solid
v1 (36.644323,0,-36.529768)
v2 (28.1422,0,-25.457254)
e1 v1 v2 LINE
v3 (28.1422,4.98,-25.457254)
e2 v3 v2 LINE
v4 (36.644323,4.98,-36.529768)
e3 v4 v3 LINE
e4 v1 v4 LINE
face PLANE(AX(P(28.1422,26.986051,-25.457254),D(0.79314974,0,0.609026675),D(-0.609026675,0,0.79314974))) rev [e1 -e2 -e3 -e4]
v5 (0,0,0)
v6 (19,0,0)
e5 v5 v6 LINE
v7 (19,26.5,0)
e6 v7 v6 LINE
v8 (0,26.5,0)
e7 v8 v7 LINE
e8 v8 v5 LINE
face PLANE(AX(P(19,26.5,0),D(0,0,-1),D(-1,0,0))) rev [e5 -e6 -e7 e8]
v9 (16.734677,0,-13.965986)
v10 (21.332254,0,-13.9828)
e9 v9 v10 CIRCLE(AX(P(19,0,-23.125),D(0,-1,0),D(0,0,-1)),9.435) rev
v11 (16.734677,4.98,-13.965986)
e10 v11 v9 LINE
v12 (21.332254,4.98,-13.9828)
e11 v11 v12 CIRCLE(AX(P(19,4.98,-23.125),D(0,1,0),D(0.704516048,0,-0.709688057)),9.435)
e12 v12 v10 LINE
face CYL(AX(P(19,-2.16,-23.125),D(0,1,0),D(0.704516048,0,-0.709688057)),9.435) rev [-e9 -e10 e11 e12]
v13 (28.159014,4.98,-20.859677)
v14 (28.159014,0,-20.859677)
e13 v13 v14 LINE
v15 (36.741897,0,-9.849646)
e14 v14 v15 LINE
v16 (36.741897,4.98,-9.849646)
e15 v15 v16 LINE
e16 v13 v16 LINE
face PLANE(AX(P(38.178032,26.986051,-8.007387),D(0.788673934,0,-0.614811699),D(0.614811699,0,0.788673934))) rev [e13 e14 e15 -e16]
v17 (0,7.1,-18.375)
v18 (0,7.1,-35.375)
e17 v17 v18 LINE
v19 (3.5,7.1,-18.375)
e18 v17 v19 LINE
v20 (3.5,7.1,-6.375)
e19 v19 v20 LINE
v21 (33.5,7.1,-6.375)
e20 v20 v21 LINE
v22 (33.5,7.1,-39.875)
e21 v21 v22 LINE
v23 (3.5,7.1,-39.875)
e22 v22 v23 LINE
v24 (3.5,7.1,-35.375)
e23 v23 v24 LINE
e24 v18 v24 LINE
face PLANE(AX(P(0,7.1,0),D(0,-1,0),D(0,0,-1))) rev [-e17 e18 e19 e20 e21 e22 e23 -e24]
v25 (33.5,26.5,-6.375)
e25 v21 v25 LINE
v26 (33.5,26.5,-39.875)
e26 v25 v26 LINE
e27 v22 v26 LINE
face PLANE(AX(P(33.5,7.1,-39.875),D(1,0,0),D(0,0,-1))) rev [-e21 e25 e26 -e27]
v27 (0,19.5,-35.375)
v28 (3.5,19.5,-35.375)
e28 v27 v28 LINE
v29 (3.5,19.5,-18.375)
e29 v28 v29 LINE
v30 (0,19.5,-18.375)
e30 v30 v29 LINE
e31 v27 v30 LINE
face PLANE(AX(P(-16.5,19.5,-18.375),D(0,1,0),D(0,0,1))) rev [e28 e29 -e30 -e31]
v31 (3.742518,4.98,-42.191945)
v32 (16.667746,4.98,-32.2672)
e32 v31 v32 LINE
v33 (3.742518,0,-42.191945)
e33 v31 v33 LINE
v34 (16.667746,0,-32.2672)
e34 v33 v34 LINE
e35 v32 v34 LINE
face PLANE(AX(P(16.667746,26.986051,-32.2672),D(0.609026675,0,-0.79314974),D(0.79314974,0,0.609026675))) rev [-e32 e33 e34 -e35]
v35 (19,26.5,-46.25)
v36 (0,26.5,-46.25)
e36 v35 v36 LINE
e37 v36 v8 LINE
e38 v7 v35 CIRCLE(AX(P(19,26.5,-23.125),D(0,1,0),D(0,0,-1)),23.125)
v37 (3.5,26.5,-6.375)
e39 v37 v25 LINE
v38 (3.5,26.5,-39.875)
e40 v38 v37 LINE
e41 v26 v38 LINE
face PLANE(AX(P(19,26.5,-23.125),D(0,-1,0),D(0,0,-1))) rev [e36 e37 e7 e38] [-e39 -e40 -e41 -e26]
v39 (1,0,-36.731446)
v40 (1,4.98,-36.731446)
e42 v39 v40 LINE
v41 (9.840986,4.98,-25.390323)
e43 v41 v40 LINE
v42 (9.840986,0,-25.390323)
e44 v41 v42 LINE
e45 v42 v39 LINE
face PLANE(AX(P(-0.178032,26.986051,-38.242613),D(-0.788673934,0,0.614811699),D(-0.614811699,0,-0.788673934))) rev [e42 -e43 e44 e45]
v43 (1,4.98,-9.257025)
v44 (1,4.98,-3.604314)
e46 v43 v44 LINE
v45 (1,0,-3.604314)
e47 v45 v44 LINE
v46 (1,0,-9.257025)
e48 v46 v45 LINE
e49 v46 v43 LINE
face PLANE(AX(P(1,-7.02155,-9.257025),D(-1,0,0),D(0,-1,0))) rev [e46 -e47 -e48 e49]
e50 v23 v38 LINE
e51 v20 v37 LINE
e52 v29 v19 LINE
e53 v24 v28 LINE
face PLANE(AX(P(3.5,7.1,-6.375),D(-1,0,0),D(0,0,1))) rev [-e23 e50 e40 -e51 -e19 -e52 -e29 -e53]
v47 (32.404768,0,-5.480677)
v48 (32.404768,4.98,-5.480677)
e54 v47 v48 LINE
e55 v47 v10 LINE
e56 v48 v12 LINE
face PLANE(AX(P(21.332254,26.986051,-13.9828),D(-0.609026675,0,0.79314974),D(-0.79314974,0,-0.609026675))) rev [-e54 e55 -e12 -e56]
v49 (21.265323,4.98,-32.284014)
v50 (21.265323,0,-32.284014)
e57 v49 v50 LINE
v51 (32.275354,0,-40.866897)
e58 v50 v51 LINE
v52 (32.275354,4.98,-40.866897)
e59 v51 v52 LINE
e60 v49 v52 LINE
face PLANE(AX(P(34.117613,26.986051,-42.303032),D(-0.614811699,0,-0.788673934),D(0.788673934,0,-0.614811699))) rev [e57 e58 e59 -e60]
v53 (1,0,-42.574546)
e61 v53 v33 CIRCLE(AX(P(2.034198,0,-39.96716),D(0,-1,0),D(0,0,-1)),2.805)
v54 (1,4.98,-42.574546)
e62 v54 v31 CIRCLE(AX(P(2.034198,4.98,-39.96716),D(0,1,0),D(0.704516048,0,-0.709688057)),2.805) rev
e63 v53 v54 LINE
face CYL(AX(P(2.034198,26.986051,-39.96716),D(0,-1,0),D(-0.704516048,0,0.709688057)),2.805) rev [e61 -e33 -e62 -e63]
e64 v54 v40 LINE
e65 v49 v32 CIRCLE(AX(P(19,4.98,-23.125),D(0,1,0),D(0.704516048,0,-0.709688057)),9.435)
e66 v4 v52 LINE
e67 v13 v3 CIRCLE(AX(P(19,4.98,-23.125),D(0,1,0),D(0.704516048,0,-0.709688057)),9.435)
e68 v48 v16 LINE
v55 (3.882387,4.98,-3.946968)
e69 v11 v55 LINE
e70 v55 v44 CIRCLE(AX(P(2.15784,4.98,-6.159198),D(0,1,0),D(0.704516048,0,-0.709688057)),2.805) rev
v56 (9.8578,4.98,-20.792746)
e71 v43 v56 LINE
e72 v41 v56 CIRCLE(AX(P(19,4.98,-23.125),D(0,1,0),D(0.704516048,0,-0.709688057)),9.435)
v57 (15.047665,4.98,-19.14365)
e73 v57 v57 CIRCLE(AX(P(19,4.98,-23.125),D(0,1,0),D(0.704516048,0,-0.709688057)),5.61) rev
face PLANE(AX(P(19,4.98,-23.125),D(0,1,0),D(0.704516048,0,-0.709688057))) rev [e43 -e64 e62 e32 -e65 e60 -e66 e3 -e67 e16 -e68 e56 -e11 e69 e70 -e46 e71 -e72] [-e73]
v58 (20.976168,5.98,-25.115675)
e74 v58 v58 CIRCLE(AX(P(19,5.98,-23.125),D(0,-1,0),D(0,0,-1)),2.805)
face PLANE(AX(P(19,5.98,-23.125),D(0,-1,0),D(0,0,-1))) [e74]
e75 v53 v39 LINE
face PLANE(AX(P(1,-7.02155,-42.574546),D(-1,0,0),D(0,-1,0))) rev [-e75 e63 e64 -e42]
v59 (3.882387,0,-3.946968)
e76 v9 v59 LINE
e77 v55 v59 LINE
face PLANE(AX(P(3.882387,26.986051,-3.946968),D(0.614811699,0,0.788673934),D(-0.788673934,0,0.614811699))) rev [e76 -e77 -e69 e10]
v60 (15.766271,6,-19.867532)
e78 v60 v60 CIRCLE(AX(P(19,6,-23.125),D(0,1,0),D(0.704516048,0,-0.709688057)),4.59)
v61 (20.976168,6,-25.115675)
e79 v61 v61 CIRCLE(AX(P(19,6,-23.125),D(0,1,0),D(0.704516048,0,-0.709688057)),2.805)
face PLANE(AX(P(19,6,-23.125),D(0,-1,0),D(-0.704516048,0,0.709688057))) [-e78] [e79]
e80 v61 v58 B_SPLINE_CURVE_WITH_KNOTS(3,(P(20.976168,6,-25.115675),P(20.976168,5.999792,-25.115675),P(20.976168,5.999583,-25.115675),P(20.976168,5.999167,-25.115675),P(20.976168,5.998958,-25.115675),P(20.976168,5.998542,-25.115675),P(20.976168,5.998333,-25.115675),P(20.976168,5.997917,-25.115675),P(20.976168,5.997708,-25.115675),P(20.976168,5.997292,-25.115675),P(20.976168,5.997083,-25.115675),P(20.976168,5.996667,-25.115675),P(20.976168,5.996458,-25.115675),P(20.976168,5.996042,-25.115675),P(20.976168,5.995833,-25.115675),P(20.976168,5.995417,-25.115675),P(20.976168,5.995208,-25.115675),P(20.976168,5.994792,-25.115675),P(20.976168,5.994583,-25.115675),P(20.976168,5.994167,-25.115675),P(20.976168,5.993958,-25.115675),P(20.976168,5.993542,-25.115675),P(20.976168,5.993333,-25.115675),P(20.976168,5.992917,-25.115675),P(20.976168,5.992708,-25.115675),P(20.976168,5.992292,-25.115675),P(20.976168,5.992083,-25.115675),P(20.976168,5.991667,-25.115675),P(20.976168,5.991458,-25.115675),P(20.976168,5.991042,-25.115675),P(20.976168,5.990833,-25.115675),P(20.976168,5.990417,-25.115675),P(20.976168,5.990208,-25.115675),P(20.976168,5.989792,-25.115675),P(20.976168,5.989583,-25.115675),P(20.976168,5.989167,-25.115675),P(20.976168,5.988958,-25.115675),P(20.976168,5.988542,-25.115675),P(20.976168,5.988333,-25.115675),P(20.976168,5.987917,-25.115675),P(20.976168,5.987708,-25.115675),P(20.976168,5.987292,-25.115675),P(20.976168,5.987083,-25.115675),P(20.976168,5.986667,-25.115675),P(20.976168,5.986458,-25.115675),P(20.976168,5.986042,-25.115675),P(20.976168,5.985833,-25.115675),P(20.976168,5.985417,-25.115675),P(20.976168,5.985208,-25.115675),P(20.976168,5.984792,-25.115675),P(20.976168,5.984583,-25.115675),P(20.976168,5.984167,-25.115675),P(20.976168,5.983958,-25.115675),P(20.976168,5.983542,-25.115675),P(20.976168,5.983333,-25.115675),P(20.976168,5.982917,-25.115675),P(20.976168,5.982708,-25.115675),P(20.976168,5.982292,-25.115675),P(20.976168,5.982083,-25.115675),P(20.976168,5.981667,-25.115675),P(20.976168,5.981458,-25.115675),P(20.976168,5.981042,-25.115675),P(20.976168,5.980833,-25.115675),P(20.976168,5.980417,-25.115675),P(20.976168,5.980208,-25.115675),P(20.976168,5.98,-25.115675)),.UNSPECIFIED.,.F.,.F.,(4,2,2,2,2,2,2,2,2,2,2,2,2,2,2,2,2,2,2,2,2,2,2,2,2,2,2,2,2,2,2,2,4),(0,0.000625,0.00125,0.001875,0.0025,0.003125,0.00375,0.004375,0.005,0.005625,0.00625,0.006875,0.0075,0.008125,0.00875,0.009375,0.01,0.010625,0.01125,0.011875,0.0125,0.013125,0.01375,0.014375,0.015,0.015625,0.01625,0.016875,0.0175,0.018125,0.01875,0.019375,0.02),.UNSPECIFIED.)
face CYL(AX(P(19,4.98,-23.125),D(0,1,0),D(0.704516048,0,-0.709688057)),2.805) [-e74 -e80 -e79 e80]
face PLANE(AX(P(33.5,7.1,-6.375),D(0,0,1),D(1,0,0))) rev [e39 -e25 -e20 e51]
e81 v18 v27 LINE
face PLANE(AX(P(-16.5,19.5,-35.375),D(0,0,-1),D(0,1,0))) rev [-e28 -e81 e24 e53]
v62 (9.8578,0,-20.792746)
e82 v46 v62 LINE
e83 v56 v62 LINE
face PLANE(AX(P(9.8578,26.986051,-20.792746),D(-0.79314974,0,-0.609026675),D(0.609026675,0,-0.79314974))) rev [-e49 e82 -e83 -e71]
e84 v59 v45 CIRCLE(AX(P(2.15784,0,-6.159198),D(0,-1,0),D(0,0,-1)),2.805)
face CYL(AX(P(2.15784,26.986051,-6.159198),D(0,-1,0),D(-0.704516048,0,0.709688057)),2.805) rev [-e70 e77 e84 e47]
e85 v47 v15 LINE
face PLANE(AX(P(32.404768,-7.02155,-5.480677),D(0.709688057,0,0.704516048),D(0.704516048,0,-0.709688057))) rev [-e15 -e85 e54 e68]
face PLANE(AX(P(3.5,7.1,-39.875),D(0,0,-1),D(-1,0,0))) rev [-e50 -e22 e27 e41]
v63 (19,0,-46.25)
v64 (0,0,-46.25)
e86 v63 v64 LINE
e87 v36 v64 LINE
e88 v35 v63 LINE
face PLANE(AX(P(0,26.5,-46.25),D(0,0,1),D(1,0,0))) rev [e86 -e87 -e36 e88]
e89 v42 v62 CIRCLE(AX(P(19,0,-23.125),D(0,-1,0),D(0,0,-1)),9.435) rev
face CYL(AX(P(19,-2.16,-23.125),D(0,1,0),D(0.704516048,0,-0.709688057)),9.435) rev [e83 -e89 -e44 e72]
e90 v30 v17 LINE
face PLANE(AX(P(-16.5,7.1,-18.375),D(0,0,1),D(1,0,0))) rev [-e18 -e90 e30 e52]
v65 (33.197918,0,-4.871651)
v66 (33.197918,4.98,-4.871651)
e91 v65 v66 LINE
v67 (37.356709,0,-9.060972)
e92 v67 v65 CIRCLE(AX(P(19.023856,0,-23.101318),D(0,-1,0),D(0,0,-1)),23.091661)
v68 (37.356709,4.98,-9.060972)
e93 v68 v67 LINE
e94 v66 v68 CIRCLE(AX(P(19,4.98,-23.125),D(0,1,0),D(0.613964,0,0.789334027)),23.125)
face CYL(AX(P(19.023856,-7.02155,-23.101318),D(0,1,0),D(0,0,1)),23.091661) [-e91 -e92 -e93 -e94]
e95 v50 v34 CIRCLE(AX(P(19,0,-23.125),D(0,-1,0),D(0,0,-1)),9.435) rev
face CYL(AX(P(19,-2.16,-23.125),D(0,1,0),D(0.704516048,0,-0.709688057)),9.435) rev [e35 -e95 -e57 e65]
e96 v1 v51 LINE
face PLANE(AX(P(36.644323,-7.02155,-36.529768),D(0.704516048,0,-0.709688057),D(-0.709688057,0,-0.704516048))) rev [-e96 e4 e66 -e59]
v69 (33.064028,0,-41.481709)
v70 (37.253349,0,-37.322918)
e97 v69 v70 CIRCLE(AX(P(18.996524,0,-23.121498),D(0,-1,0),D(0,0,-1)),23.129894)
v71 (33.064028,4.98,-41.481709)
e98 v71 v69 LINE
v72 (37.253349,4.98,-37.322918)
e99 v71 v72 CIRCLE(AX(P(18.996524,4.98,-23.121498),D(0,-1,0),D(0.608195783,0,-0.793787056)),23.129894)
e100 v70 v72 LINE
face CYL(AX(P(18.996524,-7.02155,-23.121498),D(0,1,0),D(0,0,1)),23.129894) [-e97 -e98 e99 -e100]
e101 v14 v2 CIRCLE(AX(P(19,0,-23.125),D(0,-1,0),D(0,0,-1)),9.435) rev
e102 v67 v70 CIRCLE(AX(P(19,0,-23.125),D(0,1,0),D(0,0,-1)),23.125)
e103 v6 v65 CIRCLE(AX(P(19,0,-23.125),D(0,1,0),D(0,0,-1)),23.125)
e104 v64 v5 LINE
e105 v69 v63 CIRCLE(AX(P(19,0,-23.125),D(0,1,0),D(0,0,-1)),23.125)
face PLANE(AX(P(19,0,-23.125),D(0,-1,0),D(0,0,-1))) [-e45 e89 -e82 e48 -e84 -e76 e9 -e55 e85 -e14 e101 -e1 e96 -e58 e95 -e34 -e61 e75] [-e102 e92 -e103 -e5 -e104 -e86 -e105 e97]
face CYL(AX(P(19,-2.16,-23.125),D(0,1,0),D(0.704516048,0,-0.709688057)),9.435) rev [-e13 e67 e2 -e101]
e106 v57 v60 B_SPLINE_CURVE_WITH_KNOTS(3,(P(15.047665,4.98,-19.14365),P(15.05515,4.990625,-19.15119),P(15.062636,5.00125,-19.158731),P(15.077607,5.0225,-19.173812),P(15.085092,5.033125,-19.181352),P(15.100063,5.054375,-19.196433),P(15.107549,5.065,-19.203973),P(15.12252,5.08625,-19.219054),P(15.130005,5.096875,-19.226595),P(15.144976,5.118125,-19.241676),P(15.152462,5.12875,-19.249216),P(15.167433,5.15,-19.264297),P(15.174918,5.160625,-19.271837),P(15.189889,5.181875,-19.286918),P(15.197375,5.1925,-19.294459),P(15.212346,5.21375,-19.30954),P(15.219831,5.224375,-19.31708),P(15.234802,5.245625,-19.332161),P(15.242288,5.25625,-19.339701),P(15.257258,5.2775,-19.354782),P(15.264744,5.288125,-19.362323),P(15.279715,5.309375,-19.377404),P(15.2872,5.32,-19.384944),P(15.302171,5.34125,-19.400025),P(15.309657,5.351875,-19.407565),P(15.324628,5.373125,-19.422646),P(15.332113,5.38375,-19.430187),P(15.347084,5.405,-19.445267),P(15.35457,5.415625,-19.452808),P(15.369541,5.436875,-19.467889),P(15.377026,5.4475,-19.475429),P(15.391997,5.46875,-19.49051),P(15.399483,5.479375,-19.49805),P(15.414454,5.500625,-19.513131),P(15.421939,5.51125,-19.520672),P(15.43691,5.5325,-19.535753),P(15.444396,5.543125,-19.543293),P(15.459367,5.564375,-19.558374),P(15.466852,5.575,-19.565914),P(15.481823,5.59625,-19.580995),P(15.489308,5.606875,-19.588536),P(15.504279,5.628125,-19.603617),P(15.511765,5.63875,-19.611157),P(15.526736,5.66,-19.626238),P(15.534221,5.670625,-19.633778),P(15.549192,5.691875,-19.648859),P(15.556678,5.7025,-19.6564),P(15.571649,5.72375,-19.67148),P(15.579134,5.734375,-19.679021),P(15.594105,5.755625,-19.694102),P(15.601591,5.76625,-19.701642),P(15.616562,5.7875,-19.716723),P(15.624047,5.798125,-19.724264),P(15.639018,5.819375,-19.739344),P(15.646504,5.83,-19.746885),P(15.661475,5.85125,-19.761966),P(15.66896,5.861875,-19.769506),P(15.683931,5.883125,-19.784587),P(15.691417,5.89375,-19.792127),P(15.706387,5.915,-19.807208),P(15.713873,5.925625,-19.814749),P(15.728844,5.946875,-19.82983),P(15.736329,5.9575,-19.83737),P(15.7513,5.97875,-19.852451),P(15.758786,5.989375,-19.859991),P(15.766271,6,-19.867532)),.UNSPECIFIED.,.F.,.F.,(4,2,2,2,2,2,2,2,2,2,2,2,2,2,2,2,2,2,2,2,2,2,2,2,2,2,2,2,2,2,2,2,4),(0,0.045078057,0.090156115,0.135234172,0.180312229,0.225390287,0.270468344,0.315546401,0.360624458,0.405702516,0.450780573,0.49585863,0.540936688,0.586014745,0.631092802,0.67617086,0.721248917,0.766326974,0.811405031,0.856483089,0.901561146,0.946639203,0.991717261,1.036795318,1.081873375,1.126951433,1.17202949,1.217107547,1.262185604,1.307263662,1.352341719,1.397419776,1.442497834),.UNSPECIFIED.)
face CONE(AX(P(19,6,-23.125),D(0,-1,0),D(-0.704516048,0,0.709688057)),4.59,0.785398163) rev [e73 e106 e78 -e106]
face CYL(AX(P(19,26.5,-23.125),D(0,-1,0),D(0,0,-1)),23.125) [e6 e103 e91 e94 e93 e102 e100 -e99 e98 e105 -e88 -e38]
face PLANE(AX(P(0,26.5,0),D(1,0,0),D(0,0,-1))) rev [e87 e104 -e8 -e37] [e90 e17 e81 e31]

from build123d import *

# Parameters (mm, degrees)
BOSS_EXTRUDE1_DEPTH = 26.5
SKETCH2_W           = 30
SKETCH2_H           = 33.5
CUT_EXTRUDE1_DEPTH  = 19.4
SKETCH4_W           = 17
SKETCH4_H           = 12.4
CUT_EXTRUDE2_DEPTH  = 20
CAVITY1_START       = 2.94
CAVITY1_OUTLINE_R   = 1.683
CAVITY1_DEPTH       = 2.04
CAVITY1_START_2     = 4.98
CAVITY1_2_OUTLINE_R = 2.805
CAVITY1_2_DEPTH     = 1.02
CAVITY1_4_OUTLINE_R = 1.02
CAVITY1_4_DEPTH     = 4.98
SKETCH5_R           = 1.02
SKETCH5_R_2         = 1.029447566
SKETCH5_R_3         = 1.072758169
SKETCH5_R_4         = 5.61
CUT_EXTRUDE3_DEPTH  = 4.98
SKETCH6_R           = 2.805
CUT_EXTRUDE4_DEPTH  = 1
BOSS_EXTRUDE5_START = 4.98
BOSS_EXTRUDE5_DEPTH = 4.98


with BuildPart() as part:
    # Sketch1 → Boss-Extrude1 (new body)
    with BuildSketch(Plane(origin=(0, 0, 0), x_dir=(1, 0, 0), z_dir=(0, 1, 0))):
        with BuildLine():
            Line((0, 0), (0, 46.25))
            Line((0, 46.25), (19, 46.25))
            ThreePointArc((19, 46.25), (42.125, 23.125), (19, 0))
            Line((19, 0), (0, 0))
        make_face()
    extrude(amount=BOSS_EXTRUDE1_DEPTH)

    # Sketch2 → Cut-Extrude1 (cut)
    with BuildSketch(Plane(origin=(0, 26.5, 0), x_dir=(1, 0, 0), z_dir=(0, 1, 0))):
        with Locations((18.5, 23.125)):
            Rectangle(SKETCH2_W, SKETCH2_H)
    extrude(amount=-CUT_EXTRUDE1_DEPTH, mode=Mode.SUBTRACT)

    # Sketch4 → Cut-Extrude2 (cut)
    with BuildSketch(Plane(origin=(3.5, 0, 0), x_dir=(0, 0, -1), z_dir=(1, 0, 0))):
        with Locations((26.875, 13.3)):
            Rectangle(SKETCH4_W, SKETCH4_H)
    extrude(amount=-CUT_EXTRUDE2_DEPTH, mode=Mode.SUBTRACT)

    # Cavity1: read off the stored shape, not the designer's step
    # Cavity1 outline → Cavity1 (cut)
    with BuildSketch(Plane(origin=(0, 0, 0), x_dir=(1, 0, 0), z_dir=(0, 1, 0)).offset(CAVITY1_START)):
        with BuildLine():
            ThreePointArc((22.363714727, 25.434074108), (22.227776518, 25.620567821), (22.081511243, 25.799077123))
            Line((22.081511243, 25.799077123), (21.544048072, 25.486146267))
            Line((21.544048072, 25.486146267), (21.34247524, 25.686250093))
            Line((21.34247524, 25.686250093), (21.651466571, 26.225987749))
            ThreePointArc((21.651466571, 26.225987749), (21.47189222, 26.370943446), (21.284409206, 26.505513952))
            Line((21.284409206, 26.505513952), (20.846252114, 26.064140252))
            Line((20.846252114, 26.064140252), (20.599757028, 26.205254817))
            Line((20.599757028, 26.205254817), (20.75852535, 26.8065742))
            ThreePointArc((20.75852535, 26.8065742), (20.547552552, 26.900113389), (20.331628457, 26.981574342))
            Line((20.331628457, 26.981574342), (20.022637125, 26.441836685))
            Line((20.022637125, 26.441836685), (19.748018019, 26.514345266))
            Line((19.748018019, 26.514345266), (19.745743533, 27.136267453))
            ThreePointArc((19.745743533, 27.136267453), (19.517749735, 27.172015593), (19.288099429, 27.194815563))
            Line((19.288099429, 27.194815563), (19.129331107, 26.59349618))
            Line((19.129331107, 26.59349618), (18.845302817, 26.592457436))
            Line((18.845302817, 26.592457436), (18.682140527, 27.192599459))
            ThreePointArc((18.682140527, 27.192599459), (18.452663129, 27.168120373), (18.224936901, 27.13070558))
            Line((18.224936901, 27.13070558), (18.227211387, 26.508783392))
            Line((18.227211387, 26.508783392), (17.953129974, 26.434268112))
            Line((17.953129974, 26.434268112), (17.640199118, 26.971731283))
            ThreePointArc((17.640199118, 26.971731283), (17.424876627, 26.888693181), (17.214593643, 26.793613381))
            Line((17.214593643, 26.793613381), (17.377755934, 26.193471358))
            Line((17.377755934, 26.193471358), (17.132299592, 26.050557635))
            Line((17.132299592, 26.050557635), (16.690925892, 26.488714727))
            ThreePointArc((16.690925892, 26.488714727), (16.504432179, 26.352776518), (16.325922877, 26.206511243))
            Line((16.325922877, 26.206511243), (16.638853733, 25.669048072))
            Line((16.638853733, 25.669048072), (16.438749907, 25.46747524))
            Line((16.438749907, 25.46747524), (15.899012251, 25.776466571))
            ThreePointArc((15.899012251, 25.776466571), (15.754056554, 25.59689222), (15.619486048, 25.409409206))
            Line((15.619486048, 25.409409206), (16.060859748, 24.971252114))
            Line((16.060859748, 24.971252114), (15.919745183, 24.724757028))
            Line((15.919745183, 24.724757028), (15.3184258, 24.88352535))
            ThreePointArc((15.3184258, 24.88352535), (15.224886611, 24.672552552), (15.143425658, 24.456628457))
            Line((15.143425658, 24.456628457), (15.683163315, 24.147637125))
            Line((15.683163315, 24.147637125), (15.610654734, 23.873018019))
            Line((15.610654734, 23.873018019), (14.988732547, 23.870743533))
            ThreePointArc((14.988732547, 23.870743533), (14.952984407, 23.642749735), (14.930184437, 23.413099429))
            Line((14.930184437, 23.413099429), (15.53150382, 23.254331107))
            Line((15.53150382, 23.254331107), (15.532542564, 22.970302817))
            Line((15.532542564, 22.970302817), (14.932400541, 22.807140527))
            ThreePointArc((14.932400541, 22.807140527), (14.956879627, 22.577663129), (14.99429442, 22.349936901))
            Line((14.99429442, 22.349936901), (15.616216608, 22.352211387))
            Line((15.616216608, 22.352211387), (15.690731888, 22.078129974))
            Line((15.690731888, 22.078129974), (15.153268717, 21.765199118))
            ThreePointArc((15.153268717, 21.765199118), (15.236306819, 21.549876627), (15.331386619, 21.339593643))
            Line((15.331386619, 21.339593643), (15.931528642, 21.502755934))
            Line((15.931528642, 21.502755934), (16.074442365, 21.257299592))
            Line((16.074442365, 21.257299592), (15.636285273, 20.815925892))
            ThreePointArc((15.636285273, 20.815925892), (15.772223482, 20.629432179), (15.918488757, 20.450922877))
            Line((15.918488757, 20.450922877), (16.455951928, 20.763853733))
            Line((16.455951928, 20.763853733), (16.65752476, 20.563749907))
            Line((16.65752476, 20.563749907), (16.348533429, 20.024012251))
            ThreePointArc((16.348533429, 20.024012251), (16.52810778, 19.879056554), (16.715590794, 19.744486048))
            Line((16.715590794, 19.744486048), (17.153747886, 20.185859748))
            Line((17.153747886, 20.185859748), (17.400242972, 20.044745183))
            Line((17.400242972, 20.044745183), (17.24147465, 19.4434258))
            ThreePointArc((17.24147465, 19.4434258), (17.452447448, 19.349886611), (17.668371543, 19.268425658))
            Line((17.668371543, 19.268425658), (17.977362875, 19.808163315))
            Line((17.977362875, 19.808163315), (18.251981981, 19.735654734))
            Line((18.251981981, 19.735654734), (18.254256467, 19.113732547))
            ThreePointArc((18.254256467, 19.113732547), (18.482250265, 19.077984407), (18.711900571, 19.055184437))
            Line((18.711900571, 19.055184437), (18.870668893, 19.65650382))
            Line((18.870668893, 19.65650382), (19.154697183, 19.657542564))
            Line((19.154697183, 19.657542564), (19.317859473, 19.057400541))
            ThreePointArc((19.317859473, 19.057400541), (19.547336871, 19.081879627), (19.775063099, 19.11929442))
            Line((19.775063099, 19.11929442), (19.772788613, 19.741216608))
            Line((19.772788613, 19.741216608), (20.046870026, 19.815731888))
            Line((20.046870026, 19.815731888), (20.359800882, 19.278268717))
            ThreePointArc((20.359800882, 19.278268717), (20.575123373, 19.361306819), (20.785406357, 19.456386619))
            Line((20.785406357, 19.456386619), (20.622244066, 20.056528642))
            Line((20.622244066, 20.056528642), (20.867700408, 20.199442365))
            Line((20.867700408, 20.199442365), (21.309074108, 19.761285273))
            ThreePointArc((21.309074108, 19.761285273), (21.495567821, 19.897223482), (21.674077123, 20.043488757))
            Line((21.674077123, 20.043488757), (21.361146267, 20.580951928))
            Line((21.361146267, 20.580951928), (21.561250093, 20.78252476))
            Line((21.561250093, 20.78252476), (22.100987749, 20.473533429))
            ThreePointArc((22.100987749, 20.473533429), (22.245943446, 20.65310778), (22.380513952, 20.840590794))
            Line((22.380513952, 20.840590794), (21.939140252, 21.278747886))
            Line((21.939140252, 21.278747886), (22.080254817, 21.525242972))
            Line((22.080254817, 21.525242972), (22.6815742, 21.36647465))
            ThreePointArc((22.6815742, 21.36647465), (22.775113389, 21.577447448), (22.856574342, 21.793371543))
            Line((22.856574342, 21.793371543), (22.316836685, 22.102362875))
            Line((22.316836685, 22.102362875), (22.389345266, 22.376981981))
            Line((22.389345266, 22.376981981), (23.011267453, 22.379256467))
            ThreePointArc((23.011267453, 22.379256467), (23.047015593, 22.607250265), (23.069815563, 22.836900571))
            Line((23.069815563, 22.836900571), (22.46849618, 22.995668893))
            Line((22.46849618, 22.995668893), (22.467457436, 23.279697183))
            Line((22.467457436, 23.279697183), (23.067599459, 23.442859473))
            ThreePointArc((23.067599459, 23.442859473), (23.043120373, 23.672336871), (23.00570558, 23.900063099))
            Line((23.00570558, 23.900063099), (22.383783392, 23.897788613))
            Line((22.383783392, 23.897788613), (22.309268112, 24.171870026))
            Line((22.309268112, 24.171870026), (22.846731283, 24.484800882))
            ThreePointArc((22.846731283, 24.484800882), (22.763693181, 24.700123373), (22.668613381, 24.910406357))
            Line((22.668613381, 24.910406357), (22.068471358, 24.747244066))
            Line((22.068471358, 24.747244066), (21.925557635, 24.992700408))
            Line((21.925557635, 24.992700408), (22.363714727, 25.434074108))
        make_face()
        with Locations((19, 23.125)):
            Circle(CAVITY1_OUTLINE_R, mode=Mode.SUBTRACT)
    extrude(amount=CAVITY1_DEPTH, mode=Mode.SUBTRACT)

    # Cavity1 2 outline → Cavity1 2 (cut)
    with BuildSketch(Plane(origin=(0, 0, 0), x_dir=(1, 0, 0), z_dir=(0, 1, 0)).offset(CAVITY1_START_2)):
        with BuildLine():
            ThreePointArc((22.363714727, 25.434074108), (22.227776518, 25.620567821), (22.081511243, 25.799077123))
            Line((22.081511243, 25.799077123), (21.544048072, 25.486146267))
            Line((21.544048072, 25.486146267), (21.34247524, 25.686250093))
            Line((21.34247524, 25.686250093), (21.651466571, 26.225987749))
            ThreePointArc((21.651466571, 26.225987749), (21.47189222, 26.370943446), (21.284409206, 26.505513952))
            Line((21.284409206, 26.505513952), (20.846252114, 26.064140252))
            Line((20.846252114, 26.064140252), (20.599757028, 26.205254817))
            Line((20.599757028, 26.205254817), (20.75852535, 26.8065742))
            ThreePointArc((20.75852535, 26.8065742), (20.547552552, 26.900113389), (20.331628457, 26.981574342))
            Line((20.331628457, 26.981574342), (20.022637125, 26.441836685))
            Line((20.022637125, 26.441836685), (19.748018019, 26.514345266))
            Line((19.748018019, 26.514345266), (19.745743533, 27.136267453))
            ThreePointArc((19.745743533, 27.136267453), (19.517749735, 27.172015593), (19.288099429, 27.194815563))
            Line((19.288099429, 27.194815563), (19.129331107, 26.59349618))
            Line((19.129331107, 26.59349618), (18.845302817, 26.592457436))
            Line((18.845302817, 26.592457436), (18.682140527, 27.192599459))
            ThreePointArc((18.682140527, 27.192599459), (18.452663129, 27.168120373), (18.224936901, 27.13070558))
            Line((18.224936901, 27.13070558), (18.227211387, 26.508783392))
            Line((18.227211387, 26.508783392), (17.953129974, 26.434268112))
            Line((17.953129974, 26.434268112), (17.640199118, 26.971731283))
            ThreePointArc((17.640199118, 26.971731283), (17.424876627, 26.888693181), (17.214593643, 26.793613381))
            Line((17.214593643, 26.793613381), (17.377755934, 26.193471358))
            Line((17.377755934, 26.193471358), (17.132299592, 26.050557635))
            Line((17.132299592, 26.050557635), (16.690925892, 26.488714727))
            ThreePointArc((16.690925892, 26.488714727), (16.504432179, 26.352776518), (16.325922877, 26.206511243))
            Line((16.325922877, 26.206511243), (16.638853733, 25.669048072))
            Line((16.638853733, 25.669048072), (16.438749907, 25.46747524))
            Line((16.438749907, 25.46747524), (15.899012251, 25.776466571))
            ThreePointArc((15.899012251, 25.776466571), (15.754056554, 25.59689222), (15.619486048, 25.409409206))
            Line((15.619486048, 25.409409206), (16.060859748, 24.971252114))
            Line((16.060859748, 24.971252114), (15.919745183, 24.724757028))
            Line((15.919745183, 24.724757028), (15.3184258, 24.88352535))
            ThreePointArc((15.3184258, 24.88352535), (15.224886611, 24.672552552), (15.143425658, 24.456628457))
            Line((15.143425658, 24.456628457), (15.683163315, 24.147637125))
            Line((15.683163315, 24.147637125), (15.610654734, 23.873018019))
            Line((15.610654734, 23.873018019), (14.988732547, 23.870743533))
            ThreePointArc((14.988732547, 23.870743533), (14.952984407, 23.642749735), (14.930184437, 23.413099429))
            Line((14.930184437, 23.413099429), (15.53150382, 23.254331107))
            Line((15.53150382, 23.254331107), (15.532542564, 22.970302817))
            Line((15.532542564, 22.970302817), (14.932400541, 22.807140527))
            ThreePointArc((14.932400541, 22.807140527), (14.956879627, 22.577663129), (14.99429442, 22.349936901))
            Line((14.99429442, 22.349936901), (15.616216608, 22.352211387))
            Line((15.616216608, 22.352211387), (15.690731888, 22.078129974))
            Line((15.690731888, 22.078129974), (15.153268717, 21.765199118))
            ThreePointArc((15.153268717, 21.765199118), (15.236306819, 21.549876627), (15.331386619, 21.339593643))
            Line((15.331386619, 21.339593643), (15.931528642, 21.502755934))
            Line((15.931528642, 21.502755934), (16.074442365, 21.257299592))
            Line((16.074442365, 21.257299592), (15.636285273, 20.815925892))
            ThreePointArc((15.636285273, 20.815925892), (15.772223482, 20.629432179), (15.918488757, 20.450922877))
            Line((15.918488757, 20.450922877), (16.455951928, 20.763853733))
            Line((16.455951928, 20.763853733), (16.65752476, 20.563749907))
            Line((16.65752476, 20.563749907), (16.348533429, 20.024012251))
            ThreePointArc((16.348533429, 20.024012251), (16.52810778, 19.879056554), (16.715590794, 19.744486048))
            Line((16.715590794, 19.744486048), (17.153747886, 20.185859748))
            Line((17.153747886, 20.185859748), (17.400242972, 20.044745183))
            Line((17.400242972, 20.044745183), (17.24147465, 19.4434258))
            ThreePointArc((17.24147465, 19.4434258), (17.452447448, 19.349886611), (17.668371543, 19.268425658))
            Line((17.668371543, 19.268425658), (17.977362875, 19.808163315))
            Line((17.977362875, 19.808163315), (18.251981981, 19.735654734))
            Line((18.251981981, 19.735654734), (18.254256467, 19.113732547))
            ThreePointArc((18.254256467, 19.113732547), (18.482250265, 19.077984407), (18.711900571, 19.055184437))
            Line((18.711900571, 19.055184437), (18.870668893, 19.65650382))
            Line((18.870668893, 19.65650382), (19.154697183, 19.657542564))
            Line((19.154697183, 19.657542564), (19.317859473, 19.057400541))
            ThreePointArc((19.317859473, 19.057400541), (19.547336871, 19.081879627), (19.775063099, 19.11929442))
            Line((19.775063099, 19.11929442), (19.772788613, 19.741216608))
            Line((19.772788613, 19.741216608), (20.046870026, 19.815731888))
            Line((20.046870026, 19.815731888), (20.359800882, 19.278268717))
            ThreePointArc((20.359800882, 19.278268717), (20.575123373, 19.361306819), (20.785406357, 19.456386619))
            Line((20.785406357, 19.456386619), (20.622244066, 20.056528642))
            Line((20.622244066, 20.056528642), (20.867700408, 20.199442365))
            Line((20.867700408, 20.199442365), (21.309074108, 19.761285273))
            ThreePointArc((21.309074108, 19.761285273), (21.495567821, 19.897223482), (21.674077123, 20.043488757))
            Line((21.674077123, 20.043488757), (21.361146267, 20.580951928))
            Line((21.361146267, 20.580951928), (21.561250093, 20.78252476))
            Line((21.561250093, 20.78252476), (22.100987749, 20.473533429))
            ThreePointArc((22.100987749, 20.473533429), (22.245943446, 20.65310778), (22.380513952, 20.840590794))
            Line((22.380513952, 20.840590794), (21.939140252, 21.278747886))
            Line((21.939140252, 21.278747886), (22.080254817, 21.525242972))
            Line((22.080254817, 21.525242972), (22.6815742, 21.36647465))
            ThreePointArc((22.6815742, 21.36647465), (22.775113389, 21.577447448), (22.856574342, 21.793371543))
            Line((22.856574342, 21.793371543), (22.316836685, 22.102362875))
            Line((22.316836685, 22.102362875), (22.389345266, 22.376981981))
            Line((22.389345266, 22.376981981), (23.011267453, 22.379256467))
            ThreePointArc((23.011267453, 22.379256467), (23.047015593, 22.607250265), (23.069815563, 22.836900571))
            Line((23.069815563, 22.836900571), (22.46849618, 22.995668893))
            Line((22.46849618, 22.995668893), (22.467457436, 23.279697183))
            Line((22.467457436, 23.279697183), (23.067599459, 23.442859473))
            ThreePointArc((23.067599459, 23.442859473), (23.043120373, 23.672336871), (23.00570558, 23.900063099))
            Line((23.00570558, 23.900063099), (22.383783392, 23.897788613))
            Line((22.383783392, 23.897788613), (22.309268112, 24.171870026))
            Line((22.309268112, 24.171870026), (22.846731283, 24.484800882))
            ThreePointArc((22.846731283, 24.484800882), (22.763693181, 24.700123373), (22.668613381, 24.910406357))
            Line((22.668613381, 24.910406357), (22.068471358, 24.747244066))
            Line((22.068471358, 24.747244066), (21.925557635, 24.992700408))
            Line((21.925557635, 24.992700408), (22.363714727, 25.434074108))
        make_face()
        with Locations((19, 23.125)):
            Circle(CAVITY1_2_OUTLINE_R, mode=Mode.SUBTRACT)
    extrude(amount=CAVITY1_2_DEPTH, mode=Mode.SUBTRACT)

    # Cavity1 3 outline → Cavity1 3 (revolve, cut)
    with BuildSketch(Plane(origin=(19, 0, -23.125), x_dir=(1, 0, 0), z_dir=(0, 0, 1))):
        Polygon((2.805, 4.98), (5.61, 4.98), (4.59, 6), (2.805, 6), align=None)
    revolve(axis=Axis((19, 0, -23.125), (0, 1, 0)), mode=Mode.SUBTRACT)

    # Cavity1 4 outline → Cavity1 4 (cut)
    with BuildSketch(Plane(origin=(0, 0, 0), x_dir=(1, 0, 0), z_dir=(0, 1, 0))):
        with BuildLine():
            ThreePointArc((28.159014059, 20.859677403), (28.434936904, 23.159505324), (28.142199865, 25.45725355))
            Line((28.142199865, 25.45725355), (37.253349378, 37.322917505))
            ThreePointArc((37.253349378, 37.322917505), (36.577781077, 38.151218334), (35.864659554, 38.947417108))
            ThreePointArc((35.864659554, 38.947417108), (34.988991718, 39.231370443), (34.698641102, 40.104937943))
            ThreePointArc((34.698641102, 40.104937943), (33.897247659, 40.812216773), (33.064027695, 41.481708583))
            Line((33.064027695, 41.481708583), (21.265322597, 32.284014059))
            ThreePointArc((21.265322597, 32.284014059), (18.965494676, 32.559936904), (16.66774645, 32.267199865))
            Line((16.66774645, 32.267199865), (3.742517845, 42.191944975))
            ThreePointArc((3.742517845, 42.191944975), (1.814933217, 42.763576939), (0, 41.898497163))
            Line((0, 41.898497163), (0, 38.014235109))
            Line((0, 38.014235109), (9.840985941, 25.390322597))
            ThreePointArc((9.840985941, 25.390322597), (9.565063096, 23.090494676), (9.857800135, 20.79274645))
            Line((9.857800135, 20.79274645), (0, 7.954701858))
            Line((0, 7.954701858), (0, 4.367062049))
            ThreePointArc((0, 4.367062049), (1.856085865, 3.370476197), (3.88238686, 3.946967636))
            Line((3.88238686, 3.946967636), (16.734677403, 13.965985941))
            ThreePointArc((16.734677403, 13.965985941), (19.034505324, 13.690063096), (21.33225355, 13.982800135))
            Line((21.33225355, 13.982800135), (33.197917505, 4.871650622))
            ThreePointArc((33.197917505, 4.871650622), (34.026218334, 5.547218923), (34.822417108, 6.260340446))
            ThreePointArc((34.822417108, 6.260340446), (35.106370443, 7.136008282), (35.979937943, 7.426358898))
            ThreePointArc((35.979937943, 7.426358898), (36.687216773, 8.227752341), (37.356708583, 9.060972305))
            Line((37.356708583, 9.060972305), (28.159014059, 20.859677403))
        make_face()
        with Locations((2.292401913, 6.294747739)):
            Circle(CAVITY1_4_OUTLINE_R, mode=Mode.SUBTRACT)
        with Locations((5.88543376, 9.914156827)):
            Circle(CAVITY1_4_OUTLINE_R, mode=Mode.SUBTRACT)
        with Locations((9.478465606, 13.533565916)):
            Circle(CAVITY1_4_OUTLINE_R, mode=Mode.SUBTRACT)
        with Locations((13.071497453, 17.152975004)):
            Circle(CAVITY1_4_OUTLINE_R, mode=Mode.SUBTRACT)
        with Locations((32.210843173, 10.01043376)):
            Circle(CAVITY1_4_OUTLINE_R, mode=Mode.SUBTRACT)
        with Locations((24.972024996, 17.196497453)):
            Circle(CAVITY1_4_OUTLINE_R, mode=Mode.SUBTRACT)
        with Locations((28.591434084, 13.603465606)):
            Circle(CAVITY1_4_OUTLINE_R, mode=Mode.SUBTRACT)
        with Locations((9.408565916, 32.646534394)):
            Circle(CAVITY1_4_OUTLINE_R, mode=Mode.SUBTRACT)
        with BuildLine():
            Line((21.544048072, 25.486146267), (22.081511243, 25.799077123))
            ThreePointArc((22.081511243, 25.799077123), (22.227776518, 25.620567821), (22.363714727, 25.434074108))
            Line((22.363714727, 25.434074108), (21.925557635, 24.992700408))
            Line((21.925557635, 24.992700408), (22.068471358, 24.747244066))
            Line((22.068471358, 24.747244066), (22.668613381, 24.910406357))
            ThreePointArc((22.668613381, 24.910406357), (22.763693181, 24.700123373), (22.846731283, 24.484800882))
            Line((22.846731283, 24.484800882), (22.309268112, 24.171870026))
            Line((22.309268112, 24.171870026), (22.383783392, 23.897788613))
            Line((22.383783392, 23.897788613), (23.00570558, 23.900063099))
            ThreePointArc((23.00570558, 23.900063099), (23.043120373, 23.672336871), (23.067599459, 23.442859473))
            Line((23.067599459, 23.442859473), (22.467457436, 23.279697183))
            Line((22.467457436, 23.279697183), (22.46849618, 22.995668893))
            Line((22.46849618, 22.995668893), (23.069815563, 22.836900571))
            ThreePointArc((23.069815563, 22.836900571), (23.047015593, 22.607250265), (23.011267453, 22.379256467))
            Line((23.011267453, 22.379256467), (22.389345266, 22.376981981))
            Line((22.389345266, 22.376981981), (22.316836685, 22.102362875))
            Line((22.316836685, 22.102362875), (22.856574342, 21.793371543))
            ThreePointArc((22.856574342, 21.793371543), (22.775113389, 21.577447448), (22.6815742, 21.36647465))
            Line((22.6815742, 21.36647465), (22.080254817, 21.525242972))
            Line((22.080254817, 21.525242972), (21.939140252, 21.278747886))
            Line((21.939140252, 21.278747886), (22.380513952, 20.840590794))
            ThreePointArc((22.380513952, 20.840590794), (22.245943446, 20.65310778), (22.100987749, 20.473533429))
            Line((22.100987749, 20.473533429), (21.561250093, 20.78252476))
            Line((21.561250093, 20.78252476), (21.361146267, 20.580951928))
            Line((21.361146267, 20.580951928), (21.674077123, 20.043488757))
            ThreePointArc((21.674077123, 20.043488757), (21.495567821, 19.897223482), (21.309074108, 19.761285273))
            Line((21.309074108, 19.761285273), (20.867700408, 20.199442365))
            Line((20.867700408, 20.199442365), (20.622244066, 20.056528642))
            Line((20.622244066, 20.056528642), (20.785406357, 19.456386619))
            ThreePointArc((20.785406357, 19.456386619), (20.575123373, 19.361306819), (20.359800882, 19.278268717))
            Line((20.359800882, 19.278268717), (20.046870026, 19.815731888))
            Line((20.046870026, 19.815731888), (19.772788613, 19.741216608))
            Line((19.772788613, 19.741216608), (19.775063099, 19.11929442))
            ThreePointArc((19.775063099, 19.11929442), (19.547336871, 19.081879627), (19.317859473, 19.057400541))
            Line((19.317859473, 19.057400541), (19.154697183, 19.657542564))
            Line((19.154697183, 19.657542564), (18.870668893, 19.65650382))
            Line((18.870668893, 19.65650382), (18.711900571, 19.055184437))
            ThreePointArc((18.711900571, 19.055184437), (18.482250265, 19.077984407), (18.254256467, 19.113732547))
            Line((18.254256467, 19.113732547), (18.251981981, 19.735654734))
            Line((18.251981981, 19.735654734), (17.977362875, 19.808163315))
            Line((17.977362875, 19.808163315), (17.668371543, 19.268425658))
            ThreePointArc((17.668371543, 19.268425658), (17.452447448, 19.349886611), (17.24147465, 19.4434258))
            Line((17.24147465, 19.4434258), (17.400242972, 20.044745183))
            Line((17.400242972, 20.044745183), (17.153747886, 20.185859748))
            Line((17.153747886, 20.185859748), (16.715590794, 19.744486048))
            ThreePointArc((16.715590794, 19.744486048), (16.52810778, 19.879056554), (16.348533429, 20.024012251))
            Line((16.348533429, 20.024012251), (16.65752476, 20.563749907))
            Line((16.65752476, 20.563749907), (16.455951928, 20.763853733))
            Line((16.455951928, 20.763853733), (15.918488757, 20.450922877))
            ThreePointArc((15.918488757, 20.450922877), (15.772223482, 20.629432179), (15.636285273, 20.815925892))
            Line((15.636285273, 20.815925892), (16.074442365, 21.257299592))
            Line((16.074442365, 21.257299592), (15.931528642, 21.502755934))
            Line((15.931528642, 21.502755934), (15.331386619, 21.339593643))
            ThreePointArc((15.331386619, 21.339593643), (15.236306819, 21.549876627), (15.153268717, 21.765199118))
            Line((15.153268717, 21.765199118), (15.690731888, 22.078129974))
            Line((15.690731888, 22.078129974), (15.616216608, 22.352211387))
            Line((15.616216608, 22.352211387), (14.99429442, 22.349936901))
            ThreePointArc((14.99429442, 22.349936901), (14.956879627, 22.577663129), (14.932400541, 22.807140527))
            Line((14.932400541, 22.807140527), (15.532542564, 22.970302817))
            Line((15.532542564, 22.970302817), (15.53150382, 23.254331107))
            Line((15.53150382, 23.254331107), (14.930184437, 23.413099429))
            ThreePointArc((14.930184437, 23.413099429), (14.952984407, 23.642749735), (14.988732547, 23.870743533))
            Line((14.988732547, 23.870743533), (15.610654734, 23.873018019))
            Line((15.610654734, 23.873018019), (15.683163315, 24.147637125))
            Line((15.683163315, 24.147637125), (15.143425658, 24.456628457))
            ThreePointArc((15.143425658, 24.456628457), (15.224886611, 24.672552552), (15.3184258, 24.88352535))
            Line((15.3184258, 24.88352535), (15.919745183, 24.724757028))
            Line((15.919745183, 24.724757028), (16.060859748, 24.971252114))
            Line((16.060859748, 24.971252114), (15.619486048, 25.409409206))
            ThreePointArc((15.619486048, 25.409409206), (15.754056554, 25.59689222), (15.899012251, 25.776466571))
            Line((15.899012251, 25.776466571), (16.438749907, 25.46747524))
            Line((16.438749907, 25.46747524), (16.638853733, 25.669048072))
            Line((16.638853733, 25.669048072), (16.325922877, 26.206511243))
            ThreePointArc((16.325922877, 26.206511243), (16.504432179, 26.352776518), (16.690925892, 26.488714727))
            Line((16.690925892, 26.488714727), (17.132299592, 26.050557635))
            Line((17.132299592, 26.050557635), (17.377755934, 26.193471358))
            Line((17.377755934, 26.193471358), (17.214593643, 26.793613381))
            ThreePointArc((17.214593643, 26.793613381), (17.424876627, 26.888693181), (17.640199118, 26.971731283))
            Line((17.640199118, 26.971731283), (17.953129974, 26.434268112))
            Line((17.953129974, 26.434268112), (18.227211387, 26.508783392))
            Line((18.227211387, 26.508783392), (18.224936901, 27.13070558))
            ThreePointArc((18.224936901, 27.13070558), (18.452663129, 27.168120373), (18.682140527, 27.192599459))
            Line((18.682140527, 27.192599459), (18.845302817, 26.592457436))
            Line((18.845302817, 26.592457436), (19.129331107, 26.59349618))
            Line((19.129331107, 26.59349618), (19.288099429, 27.194815563))
            ThreePointArc((19.288099429, 27.194815563), (19.517749735, 27.172015593), (19.745743533, 27.136267453))
            Line((19.745743533, 27.136267453), (19.748018019, 26.514345266))
            Line((19.748018019, 26.514345266), (20.022637125, 26.441836685))
            Line((20.022637125, 26.441836685), (20.331628457, 26.981574342))
            ThreePointArc((20.331628457, 26.981574342), (20.547552552, 26.900113389), (20.75852535, 26.8065742))
            Line((20.75852535, 26.8065742), (20.599757028, 26.205254817))
            Line((20.599757028, 26.205254817), (20.846252114, 26.064140252))
            Line((20.846252114, 26.064140252), (21.284409206, 26.505513952))
            ThreePointArc((21.284409206, 26.505513952), (21.47189222, 26.370943446), (21.651466571, 26.225987749))
            Line((21.651466571, 26.225987749), (21.34247524, 25.686250093))
            Line((21.34247524, 25.686250093), (21.544048072, 25.486146267))
        make_face(mode=Mode.SUBTRACT)
        with Locations((13.027975004, 29.053502547)):
            Circle(CAVITY1_4_OUTLINE_R, mode=Mode.SUBTRACT)
        with Locations((5.789156827, 36.23956624)):
            Circle(CAVITY1_4_OUTLINE_R, mode=Mode.SUBTRACT)
        with Locations((2.169747739, 39.832598087)):
            Circle(CAVITY1_4_OUTLINE_R, mode=Mode.SUBTRACT)
        with Locations((24.928502547, 29.097024996)):
            Circle(CAVITY1_4_OUTLINE_R, mode=Mode.SUBTRACT)
        with Locations((28.521534394, 32.716434084)):
            Circle(CAVITY1_4_OUTLINE_R, mode=Mode.SUBTRACT)
        with Locations((32.11456624, 36.335843173)):
            Circle(CAVITY1_4_OUTLINE_R, mode=Mode.SUBTRACT)
    extrude(amount=CAVITY1_4_DEPTH, mode=Mode.SUBTRACT)

    # Sketch5 → Cut-Extrude3 (cut)
    with BuildSketch(Plane.XZ):
        with Locations((2.292401913, -6.294747739)):
            Circle(SKETCH5_R)
        with Locations((5.88543376, -9.914156827)):
            Circle(SKETCH5_R)
        with Locations((9.478465606, -13.533565916)):
            Circle(SKETCH5_R)
        with Locations((13.071497453, -17.152975004)):
            Circle(SKETCH5_R)
        with Locations((24.972024996, -17.196497453)):
            Circle(SKETCH5_R)
        with Locations((28.591434084, -13.603465606)):
            Circle(SKETCH5_R)
        with Locations((32.210843173, -10.01043376)):
            Circle(SKETCH5_R)
        with Locations((24.928502547, -29.097024996)):
            Circle(SKETCH5_R_2)
        with Locations((28.521534394, -32.716434084)):
            Circle(SKETCH5_R_3)
        with Locations((32.11456624, -36.335843173)):
            Circle(SKETCH5_R)
        with Locations((35.707598087, -39.955252261)):
            Circle(SKETCH5_R)
        with Locations((2.169747739, -39.832598087)):
            Circle(SKETCH5_R)
        with Locations((5.789156827, -36.23956624)):
            Circle(SKETCH5_R)
        with Locations((9.408565916, -32.646534394)):
            Circle(SKETCH5_R)
        with Locations((13.027975004, -29.053502547)):
            Circle(SKETCH5_R)
        with Locations((35.830252261, -6.417401913)):
            Circle(SKETCH5_R)
        with Locations((19, -23.125)):
            Circle(SKETCH5_R_4)
    extrude(amount=-CUT_EXTRUDE3_DEPTH, mode=Mode.SUBTRACT)

    # Sketch6 → Cut-Extrude4 (cut)
    with BuildSketch(Plane.XZ.offset(-4.98)):
        with Locations(Location((19, -23.125, 0), (0, 0, 314.790459582))):
            Circle(SKETCH6_R)
    extrude(amount=-CUT_EXTRUDE4_DEPTH, mode=Mode.SUBTRACT)

    # Sketch7 → Boss-Extrude5 (add)
    with BuildSketch(Plane.XZ.offset(-4.98).offset(BOSS_EXTRUDE5_START)):
        with BuildLine():
            Line((0, -4.367062049), (0, -7.954701858))
            Line((0, -7.954701858), (1, -9.25702534))
            Line((1, -9.25702534), (1, -3.604314182))
            ThreePointArc((1, -3.604314182), (0.456699342, -3.928918821), (0, -4.367062049))
        make_face()
        with BuildLine():
            Line((0, -38.014235109), (0, -41.898497163))
            ThreePointArc((0, -41.898497163), (0.46320346, -42.290950198), (1, -42.574545515))
            Line((1, -42.574545515), (1, -36.731445703))
            Line((1, -36.731445703), (0, -38.014235109))
        make_face()
        with BuildLine():
            Line((32.404767765, -5.480677297), (36.741896884, -9.84964624))
            Line((36.741896884, -9.84964624), (37.356708583, -9.060972305))
            ThreePointArc((37.356708583, -9.060972305), (35.411731696, -6.832872417), (33.197917505, -4.871650622))
            Line((33.197917505, -4.871650622), (32.404767765, -5.480677297))
        make_face()
        with BuildLine():
            Line((36.644322703, -36.529767765), (32.27535376, -40.866896884))
            Line((32.27535376, -40.866896884), (33.064027695, -41.481708583))
            ThreePointArc((33.064027695, -41.481708583), (35.291905195, -39.536507675), (37.253349378, -37.322917505))
            Line((37.253349378, -37.322917505), (36.644322703, -36.529767765))
        make_face()
    extrude(amount=-BOSS_EXTRUDE5_DEPTH)


solid = part.part
